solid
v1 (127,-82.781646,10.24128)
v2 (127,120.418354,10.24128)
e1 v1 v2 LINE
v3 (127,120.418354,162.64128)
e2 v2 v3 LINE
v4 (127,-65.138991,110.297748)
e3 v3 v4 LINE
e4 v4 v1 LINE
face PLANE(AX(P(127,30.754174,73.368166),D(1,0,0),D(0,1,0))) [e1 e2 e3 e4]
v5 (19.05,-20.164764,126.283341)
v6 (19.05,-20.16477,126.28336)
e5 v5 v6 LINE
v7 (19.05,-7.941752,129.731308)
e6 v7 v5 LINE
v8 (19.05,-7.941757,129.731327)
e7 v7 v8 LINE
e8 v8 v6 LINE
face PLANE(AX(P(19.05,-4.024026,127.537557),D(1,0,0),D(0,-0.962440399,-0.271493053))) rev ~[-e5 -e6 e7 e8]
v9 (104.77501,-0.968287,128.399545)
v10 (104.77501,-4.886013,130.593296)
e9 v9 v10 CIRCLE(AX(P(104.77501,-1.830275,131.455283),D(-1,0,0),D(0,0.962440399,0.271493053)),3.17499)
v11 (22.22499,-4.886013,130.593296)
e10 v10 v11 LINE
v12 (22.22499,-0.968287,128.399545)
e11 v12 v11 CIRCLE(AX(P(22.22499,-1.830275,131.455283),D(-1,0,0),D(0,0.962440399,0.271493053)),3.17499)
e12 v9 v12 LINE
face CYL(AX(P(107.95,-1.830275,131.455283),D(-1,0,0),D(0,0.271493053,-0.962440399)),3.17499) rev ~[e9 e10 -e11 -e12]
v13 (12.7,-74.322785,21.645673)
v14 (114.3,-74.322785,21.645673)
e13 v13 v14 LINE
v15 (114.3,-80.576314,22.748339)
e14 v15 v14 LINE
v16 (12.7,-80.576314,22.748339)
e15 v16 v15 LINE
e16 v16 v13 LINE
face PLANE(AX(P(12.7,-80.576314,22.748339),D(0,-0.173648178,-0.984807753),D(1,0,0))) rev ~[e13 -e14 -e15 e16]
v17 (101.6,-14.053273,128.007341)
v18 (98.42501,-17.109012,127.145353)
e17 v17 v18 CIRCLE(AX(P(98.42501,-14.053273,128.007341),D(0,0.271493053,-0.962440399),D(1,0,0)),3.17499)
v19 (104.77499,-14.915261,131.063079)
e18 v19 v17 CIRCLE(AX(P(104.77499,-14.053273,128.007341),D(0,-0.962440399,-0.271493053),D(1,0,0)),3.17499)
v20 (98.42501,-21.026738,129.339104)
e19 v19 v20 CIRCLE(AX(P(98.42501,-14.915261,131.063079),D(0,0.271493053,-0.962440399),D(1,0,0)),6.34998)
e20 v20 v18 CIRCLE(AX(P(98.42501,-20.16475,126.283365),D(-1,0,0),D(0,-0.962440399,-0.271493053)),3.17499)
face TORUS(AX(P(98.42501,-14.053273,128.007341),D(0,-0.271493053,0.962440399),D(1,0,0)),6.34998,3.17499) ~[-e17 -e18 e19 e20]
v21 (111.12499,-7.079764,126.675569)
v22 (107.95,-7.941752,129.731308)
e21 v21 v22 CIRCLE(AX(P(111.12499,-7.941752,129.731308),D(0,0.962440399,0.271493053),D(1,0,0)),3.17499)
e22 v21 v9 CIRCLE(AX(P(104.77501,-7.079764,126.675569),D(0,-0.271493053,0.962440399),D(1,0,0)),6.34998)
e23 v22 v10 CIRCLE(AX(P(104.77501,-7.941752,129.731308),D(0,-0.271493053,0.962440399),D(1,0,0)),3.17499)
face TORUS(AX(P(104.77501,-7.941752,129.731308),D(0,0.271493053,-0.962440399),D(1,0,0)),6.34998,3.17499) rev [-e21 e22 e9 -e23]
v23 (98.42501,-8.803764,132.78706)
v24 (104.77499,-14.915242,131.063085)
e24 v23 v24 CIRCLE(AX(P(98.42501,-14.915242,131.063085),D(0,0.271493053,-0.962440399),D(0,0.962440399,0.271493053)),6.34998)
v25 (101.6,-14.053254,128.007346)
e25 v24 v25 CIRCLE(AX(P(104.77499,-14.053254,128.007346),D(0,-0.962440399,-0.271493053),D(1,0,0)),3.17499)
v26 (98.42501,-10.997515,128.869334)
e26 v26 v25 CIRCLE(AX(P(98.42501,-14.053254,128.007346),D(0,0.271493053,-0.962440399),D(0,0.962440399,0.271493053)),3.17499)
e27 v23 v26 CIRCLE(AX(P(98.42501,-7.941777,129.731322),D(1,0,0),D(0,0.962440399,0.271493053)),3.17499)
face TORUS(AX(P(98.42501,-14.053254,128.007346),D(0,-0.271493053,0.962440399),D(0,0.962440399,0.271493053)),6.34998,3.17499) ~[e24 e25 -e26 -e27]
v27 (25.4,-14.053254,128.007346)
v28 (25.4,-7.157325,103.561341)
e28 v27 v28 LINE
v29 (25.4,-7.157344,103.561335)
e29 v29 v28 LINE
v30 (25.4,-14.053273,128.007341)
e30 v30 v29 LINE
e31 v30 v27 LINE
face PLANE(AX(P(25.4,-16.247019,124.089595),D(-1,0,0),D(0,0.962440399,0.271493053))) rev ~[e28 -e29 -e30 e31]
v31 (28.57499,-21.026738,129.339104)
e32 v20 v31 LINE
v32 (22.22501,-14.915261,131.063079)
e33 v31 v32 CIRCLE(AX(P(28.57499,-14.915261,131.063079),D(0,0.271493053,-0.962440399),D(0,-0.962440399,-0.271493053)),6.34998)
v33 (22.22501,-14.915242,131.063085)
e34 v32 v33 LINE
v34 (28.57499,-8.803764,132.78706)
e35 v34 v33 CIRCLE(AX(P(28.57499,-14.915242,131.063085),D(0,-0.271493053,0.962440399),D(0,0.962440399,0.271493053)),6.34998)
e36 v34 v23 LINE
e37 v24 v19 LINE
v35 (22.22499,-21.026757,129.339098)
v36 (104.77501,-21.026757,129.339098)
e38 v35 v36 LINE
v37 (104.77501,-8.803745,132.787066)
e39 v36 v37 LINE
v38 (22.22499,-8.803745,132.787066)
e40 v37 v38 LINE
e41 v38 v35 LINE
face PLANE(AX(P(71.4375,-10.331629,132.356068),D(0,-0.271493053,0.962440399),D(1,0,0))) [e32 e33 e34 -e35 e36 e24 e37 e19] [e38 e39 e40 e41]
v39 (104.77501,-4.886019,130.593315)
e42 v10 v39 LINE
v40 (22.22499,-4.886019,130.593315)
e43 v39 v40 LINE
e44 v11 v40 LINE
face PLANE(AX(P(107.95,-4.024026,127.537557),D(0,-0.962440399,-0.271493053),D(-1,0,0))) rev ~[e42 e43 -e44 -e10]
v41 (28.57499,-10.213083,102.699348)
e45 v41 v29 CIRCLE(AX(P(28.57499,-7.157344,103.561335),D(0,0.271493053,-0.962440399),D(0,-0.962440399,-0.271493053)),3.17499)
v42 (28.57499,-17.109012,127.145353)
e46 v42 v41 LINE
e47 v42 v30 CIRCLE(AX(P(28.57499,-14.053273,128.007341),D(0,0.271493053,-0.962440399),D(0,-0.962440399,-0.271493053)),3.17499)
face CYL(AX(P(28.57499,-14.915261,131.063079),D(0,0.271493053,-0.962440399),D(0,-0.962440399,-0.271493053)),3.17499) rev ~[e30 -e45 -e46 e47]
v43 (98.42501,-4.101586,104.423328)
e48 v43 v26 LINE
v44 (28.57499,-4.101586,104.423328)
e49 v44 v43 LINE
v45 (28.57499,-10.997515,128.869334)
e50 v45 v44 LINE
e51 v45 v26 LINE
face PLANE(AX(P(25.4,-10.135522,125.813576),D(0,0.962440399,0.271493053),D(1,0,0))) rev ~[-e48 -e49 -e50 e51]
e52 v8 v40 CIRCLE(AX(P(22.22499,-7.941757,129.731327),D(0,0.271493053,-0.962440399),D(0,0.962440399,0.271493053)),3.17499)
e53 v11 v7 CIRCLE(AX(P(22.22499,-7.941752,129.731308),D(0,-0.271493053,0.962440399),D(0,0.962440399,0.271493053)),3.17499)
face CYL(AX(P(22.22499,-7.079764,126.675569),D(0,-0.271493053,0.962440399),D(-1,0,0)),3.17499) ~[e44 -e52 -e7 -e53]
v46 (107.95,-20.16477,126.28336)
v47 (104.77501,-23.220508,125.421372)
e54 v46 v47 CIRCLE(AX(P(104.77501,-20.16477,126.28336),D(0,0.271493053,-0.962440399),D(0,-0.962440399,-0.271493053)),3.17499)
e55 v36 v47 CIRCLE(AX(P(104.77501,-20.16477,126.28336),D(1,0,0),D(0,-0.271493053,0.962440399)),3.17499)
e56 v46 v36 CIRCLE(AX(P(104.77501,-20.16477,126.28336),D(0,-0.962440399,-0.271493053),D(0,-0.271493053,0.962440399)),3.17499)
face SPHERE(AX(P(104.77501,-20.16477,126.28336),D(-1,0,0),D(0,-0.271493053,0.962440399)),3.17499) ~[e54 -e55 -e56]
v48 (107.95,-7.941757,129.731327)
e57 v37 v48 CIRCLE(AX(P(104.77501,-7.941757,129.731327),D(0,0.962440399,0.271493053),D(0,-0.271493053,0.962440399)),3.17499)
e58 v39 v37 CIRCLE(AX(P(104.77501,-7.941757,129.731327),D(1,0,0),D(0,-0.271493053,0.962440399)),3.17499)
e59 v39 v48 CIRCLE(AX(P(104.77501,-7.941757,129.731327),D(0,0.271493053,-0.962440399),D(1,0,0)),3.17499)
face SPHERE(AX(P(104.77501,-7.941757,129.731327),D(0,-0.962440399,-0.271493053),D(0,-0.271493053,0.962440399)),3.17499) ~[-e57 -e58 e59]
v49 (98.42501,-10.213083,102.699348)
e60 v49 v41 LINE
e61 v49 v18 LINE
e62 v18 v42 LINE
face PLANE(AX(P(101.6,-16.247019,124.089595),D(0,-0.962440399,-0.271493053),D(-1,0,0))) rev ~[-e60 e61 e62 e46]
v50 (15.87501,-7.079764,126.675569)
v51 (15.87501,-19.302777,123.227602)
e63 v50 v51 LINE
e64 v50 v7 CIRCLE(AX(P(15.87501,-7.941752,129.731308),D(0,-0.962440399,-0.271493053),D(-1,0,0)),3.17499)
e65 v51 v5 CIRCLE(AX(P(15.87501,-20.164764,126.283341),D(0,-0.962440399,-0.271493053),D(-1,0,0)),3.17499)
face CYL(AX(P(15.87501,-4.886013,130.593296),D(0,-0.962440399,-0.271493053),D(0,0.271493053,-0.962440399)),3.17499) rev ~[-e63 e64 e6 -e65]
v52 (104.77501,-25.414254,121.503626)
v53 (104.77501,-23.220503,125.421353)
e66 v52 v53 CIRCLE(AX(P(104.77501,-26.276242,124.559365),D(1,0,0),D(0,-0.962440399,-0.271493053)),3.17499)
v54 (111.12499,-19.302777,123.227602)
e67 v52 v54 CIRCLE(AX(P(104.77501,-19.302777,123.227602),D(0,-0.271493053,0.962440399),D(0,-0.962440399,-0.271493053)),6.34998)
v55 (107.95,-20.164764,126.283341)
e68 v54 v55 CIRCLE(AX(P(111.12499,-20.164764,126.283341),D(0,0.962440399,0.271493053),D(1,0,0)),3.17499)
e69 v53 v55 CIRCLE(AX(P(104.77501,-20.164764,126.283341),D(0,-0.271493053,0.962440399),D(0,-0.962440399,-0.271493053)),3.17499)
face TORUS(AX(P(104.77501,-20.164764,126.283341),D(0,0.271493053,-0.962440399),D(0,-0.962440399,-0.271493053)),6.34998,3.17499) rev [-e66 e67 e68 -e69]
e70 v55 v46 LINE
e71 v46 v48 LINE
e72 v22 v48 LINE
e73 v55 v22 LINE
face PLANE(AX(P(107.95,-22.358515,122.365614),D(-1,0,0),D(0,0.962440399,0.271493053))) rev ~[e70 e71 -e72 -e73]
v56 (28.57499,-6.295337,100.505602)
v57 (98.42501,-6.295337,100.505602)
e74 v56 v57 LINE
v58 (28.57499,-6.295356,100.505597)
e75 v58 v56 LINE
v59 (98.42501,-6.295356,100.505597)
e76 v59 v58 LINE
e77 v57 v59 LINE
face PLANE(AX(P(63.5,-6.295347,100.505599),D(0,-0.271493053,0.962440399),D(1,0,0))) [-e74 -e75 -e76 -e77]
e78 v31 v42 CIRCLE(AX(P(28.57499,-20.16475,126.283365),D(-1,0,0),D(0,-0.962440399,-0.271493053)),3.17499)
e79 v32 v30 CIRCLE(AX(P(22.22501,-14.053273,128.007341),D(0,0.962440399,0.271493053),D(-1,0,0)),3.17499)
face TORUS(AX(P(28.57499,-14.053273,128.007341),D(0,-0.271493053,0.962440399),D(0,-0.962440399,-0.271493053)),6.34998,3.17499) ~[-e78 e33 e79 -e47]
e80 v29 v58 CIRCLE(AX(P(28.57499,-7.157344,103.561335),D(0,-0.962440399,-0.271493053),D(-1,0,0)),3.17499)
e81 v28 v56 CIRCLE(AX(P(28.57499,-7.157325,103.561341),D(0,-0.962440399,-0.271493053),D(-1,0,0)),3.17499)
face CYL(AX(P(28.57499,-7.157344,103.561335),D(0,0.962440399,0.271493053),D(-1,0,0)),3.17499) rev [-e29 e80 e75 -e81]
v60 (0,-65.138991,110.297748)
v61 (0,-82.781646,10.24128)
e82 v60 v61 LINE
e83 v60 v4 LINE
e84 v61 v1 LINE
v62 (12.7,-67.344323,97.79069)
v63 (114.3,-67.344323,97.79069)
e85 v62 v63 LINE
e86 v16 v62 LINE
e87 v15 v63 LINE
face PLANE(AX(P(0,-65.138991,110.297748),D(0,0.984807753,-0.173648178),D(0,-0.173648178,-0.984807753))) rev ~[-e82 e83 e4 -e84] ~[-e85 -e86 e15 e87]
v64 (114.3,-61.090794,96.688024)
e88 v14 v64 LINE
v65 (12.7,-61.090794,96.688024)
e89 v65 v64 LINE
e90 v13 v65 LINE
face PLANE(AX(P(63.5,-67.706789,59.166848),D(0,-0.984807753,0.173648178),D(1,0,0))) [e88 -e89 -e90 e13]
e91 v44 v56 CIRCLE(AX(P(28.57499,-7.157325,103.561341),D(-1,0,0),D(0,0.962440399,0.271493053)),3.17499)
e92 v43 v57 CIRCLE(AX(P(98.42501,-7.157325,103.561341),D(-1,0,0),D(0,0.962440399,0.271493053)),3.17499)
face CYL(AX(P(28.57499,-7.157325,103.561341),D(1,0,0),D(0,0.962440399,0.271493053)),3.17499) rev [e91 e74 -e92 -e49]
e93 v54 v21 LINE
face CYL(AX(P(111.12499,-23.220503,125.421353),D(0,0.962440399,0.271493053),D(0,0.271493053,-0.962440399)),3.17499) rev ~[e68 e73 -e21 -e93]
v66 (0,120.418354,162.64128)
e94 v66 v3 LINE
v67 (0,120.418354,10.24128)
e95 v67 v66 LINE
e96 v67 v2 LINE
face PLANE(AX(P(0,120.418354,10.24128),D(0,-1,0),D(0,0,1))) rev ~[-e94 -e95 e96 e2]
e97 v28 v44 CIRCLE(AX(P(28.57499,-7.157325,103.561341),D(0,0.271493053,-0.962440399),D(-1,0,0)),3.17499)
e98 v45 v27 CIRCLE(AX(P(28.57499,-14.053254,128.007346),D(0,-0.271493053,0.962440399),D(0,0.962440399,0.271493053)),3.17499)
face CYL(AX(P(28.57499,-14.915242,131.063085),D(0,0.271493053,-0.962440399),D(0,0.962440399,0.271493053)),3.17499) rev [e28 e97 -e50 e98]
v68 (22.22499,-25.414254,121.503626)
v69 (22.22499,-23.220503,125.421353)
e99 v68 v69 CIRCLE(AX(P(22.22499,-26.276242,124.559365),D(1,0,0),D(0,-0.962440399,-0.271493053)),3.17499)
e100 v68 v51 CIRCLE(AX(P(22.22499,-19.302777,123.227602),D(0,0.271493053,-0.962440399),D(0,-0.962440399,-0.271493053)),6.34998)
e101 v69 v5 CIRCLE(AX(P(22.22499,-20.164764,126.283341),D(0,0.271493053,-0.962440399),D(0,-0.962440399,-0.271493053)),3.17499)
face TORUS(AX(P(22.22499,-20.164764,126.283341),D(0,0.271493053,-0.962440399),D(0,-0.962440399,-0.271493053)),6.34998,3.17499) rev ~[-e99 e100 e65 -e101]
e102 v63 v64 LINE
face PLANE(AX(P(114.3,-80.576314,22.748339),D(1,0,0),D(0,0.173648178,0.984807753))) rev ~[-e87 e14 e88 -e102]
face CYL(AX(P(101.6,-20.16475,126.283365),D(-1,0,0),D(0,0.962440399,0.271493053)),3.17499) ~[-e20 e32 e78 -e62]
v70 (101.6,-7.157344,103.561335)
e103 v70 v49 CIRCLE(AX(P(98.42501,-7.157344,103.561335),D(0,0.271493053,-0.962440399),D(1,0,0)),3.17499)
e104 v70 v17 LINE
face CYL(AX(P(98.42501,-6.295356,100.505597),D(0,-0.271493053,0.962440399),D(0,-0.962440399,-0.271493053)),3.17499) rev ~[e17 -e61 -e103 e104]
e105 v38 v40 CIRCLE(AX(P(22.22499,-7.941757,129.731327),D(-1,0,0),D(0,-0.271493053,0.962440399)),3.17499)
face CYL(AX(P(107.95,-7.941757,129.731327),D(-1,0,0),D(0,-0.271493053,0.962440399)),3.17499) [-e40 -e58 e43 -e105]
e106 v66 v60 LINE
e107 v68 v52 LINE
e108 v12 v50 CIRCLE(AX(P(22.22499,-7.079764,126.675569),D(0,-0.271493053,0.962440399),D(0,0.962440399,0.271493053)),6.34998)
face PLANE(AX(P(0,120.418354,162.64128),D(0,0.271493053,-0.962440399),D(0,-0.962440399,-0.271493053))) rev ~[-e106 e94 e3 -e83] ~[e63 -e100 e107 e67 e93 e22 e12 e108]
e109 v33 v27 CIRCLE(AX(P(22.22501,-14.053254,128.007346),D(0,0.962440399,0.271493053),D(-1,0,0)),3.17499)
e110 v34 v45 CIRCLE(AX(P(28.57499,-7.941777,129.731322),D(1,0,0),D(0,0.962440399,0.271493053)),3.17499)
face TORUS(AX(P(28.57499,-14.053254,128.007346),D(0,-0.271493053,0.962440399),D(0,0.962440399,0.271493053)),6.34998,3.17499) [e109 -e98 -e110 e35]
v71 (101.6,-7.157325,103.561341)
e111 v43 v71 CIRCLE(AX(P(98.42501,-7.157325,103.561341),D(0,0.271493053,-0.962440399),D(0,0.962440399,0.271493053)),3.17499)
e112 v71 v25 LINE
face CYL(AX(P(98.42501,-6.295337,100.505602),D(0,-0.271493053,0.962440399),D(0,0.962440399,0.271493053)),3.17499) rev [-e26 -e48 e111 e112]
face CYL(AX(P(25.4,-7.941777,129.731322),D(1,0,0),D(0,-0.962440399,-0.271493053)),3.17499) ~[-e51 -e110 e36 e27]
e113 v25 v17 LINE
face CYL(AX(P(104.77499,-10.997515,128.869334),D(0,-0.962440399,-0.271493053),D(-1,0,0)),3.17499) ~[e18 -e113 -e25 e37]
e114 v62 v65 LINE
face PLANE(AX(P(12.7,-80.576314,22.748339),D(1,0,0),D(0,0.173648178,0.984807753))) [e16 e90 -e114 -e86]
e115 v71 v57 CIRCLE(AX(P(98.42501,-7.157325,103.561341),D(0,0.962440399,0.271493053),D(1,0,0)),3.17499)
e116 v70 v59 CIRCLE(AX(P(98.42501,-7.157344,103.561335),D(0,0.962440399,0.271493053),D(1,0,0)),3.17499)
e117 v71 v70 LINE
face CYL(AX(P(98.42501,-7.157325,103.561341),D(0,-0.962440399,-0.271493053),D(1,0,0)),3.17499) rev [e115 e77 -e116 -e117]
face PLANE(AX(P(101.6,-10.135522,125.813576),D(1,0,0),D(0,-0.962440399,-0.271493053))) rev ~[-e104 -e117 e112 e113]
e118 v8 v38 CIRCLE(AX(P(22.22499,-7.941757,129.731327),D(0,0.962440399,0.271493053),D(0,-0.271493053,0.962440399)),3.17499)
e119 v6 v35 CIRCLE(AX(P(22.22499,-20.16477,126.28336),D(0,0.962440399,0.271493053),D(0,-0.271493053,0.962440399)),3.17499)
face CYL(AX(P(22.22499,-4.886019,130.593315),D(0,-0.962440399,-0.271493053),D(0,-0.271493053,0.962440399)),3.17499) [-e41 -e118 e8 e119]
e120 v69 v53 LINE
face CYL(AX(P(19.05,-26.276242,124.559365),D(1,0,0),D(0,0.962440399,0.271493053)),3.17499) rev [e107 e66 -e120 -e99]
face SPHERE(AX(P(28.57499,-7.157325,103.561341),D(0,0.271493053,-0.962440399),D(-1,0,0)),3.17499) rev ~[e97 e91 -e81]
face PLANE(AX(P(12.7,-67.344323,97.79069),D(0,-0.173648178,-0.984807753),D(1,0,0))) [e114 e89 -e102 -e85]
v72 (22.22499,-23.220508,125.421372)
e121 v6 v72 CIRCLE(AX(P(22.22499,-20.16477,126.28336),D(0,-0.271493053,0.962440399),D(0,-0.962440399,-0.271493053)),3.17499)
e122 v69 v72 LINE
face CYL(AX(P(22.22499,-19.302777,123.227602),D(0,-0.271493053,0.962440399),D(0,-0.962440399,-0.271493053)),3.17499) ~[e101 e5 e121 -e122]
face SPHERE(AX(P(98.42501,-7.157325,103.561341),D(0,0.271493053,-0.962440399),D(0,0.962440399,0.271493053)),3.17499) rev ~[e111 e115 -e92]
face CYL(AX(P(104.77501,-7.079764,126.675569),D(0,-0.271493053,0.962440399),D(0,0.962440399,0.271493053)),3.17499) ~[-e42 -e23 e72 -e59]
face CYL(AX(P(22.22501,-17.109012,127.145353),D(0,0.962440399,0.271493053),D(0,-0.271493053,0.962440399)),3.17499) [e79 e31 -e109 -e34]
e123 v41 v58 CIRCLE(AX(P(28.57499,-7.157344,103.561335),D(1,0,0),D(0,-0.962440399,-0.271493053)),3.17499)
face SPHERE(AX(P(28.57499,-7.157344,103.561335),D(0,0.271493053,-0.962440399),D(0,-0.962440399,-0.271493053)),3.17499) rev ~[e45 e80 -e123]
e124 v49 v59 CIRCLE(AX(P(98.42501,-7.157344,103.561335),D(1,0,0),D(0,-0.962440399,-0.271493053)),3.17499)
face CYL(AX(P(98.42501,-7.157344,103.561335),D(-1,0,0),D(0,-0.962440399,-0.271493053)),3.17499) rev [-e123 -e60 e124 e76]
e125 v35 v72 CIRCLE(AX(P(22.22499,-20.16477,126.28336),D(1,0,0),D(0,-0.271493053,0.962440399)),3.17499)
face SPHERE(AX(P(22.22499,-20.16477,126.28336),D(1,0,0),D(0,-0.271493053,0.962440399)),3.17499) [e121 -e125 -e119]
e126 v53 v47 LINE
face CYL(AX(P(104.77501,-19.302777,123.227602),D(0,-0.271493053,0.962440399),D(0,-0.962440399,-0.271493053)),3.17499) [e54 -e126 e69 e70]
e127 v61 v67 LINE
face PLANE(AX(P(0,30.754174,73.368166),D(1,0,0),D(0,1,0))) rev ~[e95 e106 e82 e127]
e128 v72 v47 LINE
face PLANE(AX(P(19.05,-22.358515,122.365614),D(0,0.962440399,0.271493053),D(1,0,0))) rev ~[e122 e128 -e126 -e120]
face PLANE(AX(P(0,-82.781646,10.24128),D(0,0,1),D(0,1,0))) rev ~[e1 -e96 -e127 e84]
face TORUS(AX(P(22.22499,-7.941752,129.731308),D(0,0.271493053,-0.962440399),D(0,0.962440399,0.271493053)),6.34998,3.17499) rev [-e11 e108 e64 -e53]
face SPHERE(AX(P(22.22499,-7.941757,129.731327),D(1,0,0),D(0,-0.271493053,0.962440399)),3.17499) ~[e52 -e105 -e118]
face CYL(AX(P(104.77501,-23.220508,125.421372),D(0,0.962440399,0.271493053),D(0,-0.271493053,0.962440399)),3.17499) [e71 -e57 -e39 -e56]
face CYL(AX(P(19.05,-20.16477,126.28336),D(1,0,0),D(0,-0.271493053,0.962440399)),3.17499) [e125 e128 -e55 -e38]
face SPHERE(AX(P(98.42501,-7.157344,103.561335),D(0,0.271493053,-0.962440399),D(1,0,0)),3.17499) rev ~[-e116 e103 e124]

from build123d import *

# Parameters (mm, degrees)
F1_DEPTH = 127
F2_W     = 101.6
F2_H     = 76.2
F3_DEPTH = 6.35
F4_W     = 76.2
F4_H     = 6.35
F5_DEPTH = 25.4
F7_DEPTH = 6.35
F8_R     = 3.17499
F9_R     = 3.17499


# Not quite as in the source:
# - a fillet or chamfer is up to 0.001 mm smaller than in the source, because OpenCascade refuses the exact size


with BuildPart() as f1:
    # F0 (on Right) → F1 (new body)
    with BuildSketch(Plane.YZ):
        Polygon((-65.1389909149, 110.2977480159), (-82.7816457659, 10.2412803099), (120.4183542341, 10.2412803099), (120.4183542341, 162.6412803099), align=None)
    extrude(amount=F1_DEPTH)

    # F2 (on face) → F3 (cut)
    with BuildSketch(Plane(origin=(0, -82.036835794, 14.4653075624), x_dir=(1, 0, 0), z_dir=(0, -0.984807753, 0.1736481777))):
        with Locations((63.5, 46.5108103184)):
            Rectangle(F2_W, F2_H)
    extrude(amount=-F3_DEPTH, mode=Mode.SUBTRACT)

    # F4 (on face) → F5 (cut)
    with BuildSketch(Plane(origin=(0, -33.6216432412, 119.1884190074), x_dir=(1, 0, 0), z_dir=(0, -0.2714930529, 0.9624403993))):
        with Locations((63.5, 21.2276759098)):
            Rectangle(F4_W, F4_H)
    extrude(amount=-F5_DEPTH, mode=Mode.SUBTRACT)

    # F6 (on face) → F7 (join)
    with BuildSketch(Plane(origin=(0, -33.6216432412, 119.1884190074), x_dir=(1, 0, 0), z_dir=(0, -0.2714930529, 0.9624403993))):
        Polygon((25.4, 30.7526759098), (25.4, 24.4026759098), (101.6, 24.4026759098), (101.6, 18.0526759098), (101.6, 11.7026759098), (107.95, 11.7026759098), (107.95, 30.7526759098), align=None)
        Polygon((25.4, 18.0526759098), (25.4, 24.4026759098), (25.4, 30.7526759098), (19.05, 30.7526759098), (19.05, 11.7026759098), (101.6, 11.7026759098), (101.6, 18.0526759098), align=None)
    extrude(amount=F7_DEPTH)

    # F8 (radius 3.175 in the source; OpenCascade refuses exactly that, so slightly less here)
    f8_edges = [f1.edges().sort_by_distance(p)[0] for p in [
        (63.5, -22.358515, 122.365614),
        (107.95, -13.19127, 124.951586),
        (63.5, -4.024026, 127.537557),
        (19.05, -13.19127, 124.951586),
        (63.5, -24.082496, 128.477111),
        (107.95, -14.915251, 131.063082),
        (63.5, -5.748006, 133.649053),
        (19.05, -14.915251, 131.063082),
        (19.05, -23.220506, 125.421362),
        (19.05, -4.886016, 130.593305),
        (107.95, -23.220506, 125.421362),
        (107.95, -4.886016, 130.593305),
        (63.5, -11.859503, 131.925073),
        (101.6, -14.915251, 131.063082),
        (63.5, -17.971, 130.201092),
        (25.4, -14.915251, 131.063082),
        (25.4, -13.661047, 114.92235),
        (25.4, -7.549551, 116.646331),
        (101.6, -7.549551, 116.646331),
        (101.6, -13.661047, 114.92235),
    ]]
    fillet(f8_edges, radius=F8_R)

    # F9 (radius 3.175 in the source; OpenCascade refuses exactly that, so slightly less here)
    f9_edges = [f1.edges().sort_by_distance(p)[0] for p in [
        (63.5, -3.239599, 101.36759),
    ]]
    fillet(f9_edges, radius=F9_R)


solid = f1.part
